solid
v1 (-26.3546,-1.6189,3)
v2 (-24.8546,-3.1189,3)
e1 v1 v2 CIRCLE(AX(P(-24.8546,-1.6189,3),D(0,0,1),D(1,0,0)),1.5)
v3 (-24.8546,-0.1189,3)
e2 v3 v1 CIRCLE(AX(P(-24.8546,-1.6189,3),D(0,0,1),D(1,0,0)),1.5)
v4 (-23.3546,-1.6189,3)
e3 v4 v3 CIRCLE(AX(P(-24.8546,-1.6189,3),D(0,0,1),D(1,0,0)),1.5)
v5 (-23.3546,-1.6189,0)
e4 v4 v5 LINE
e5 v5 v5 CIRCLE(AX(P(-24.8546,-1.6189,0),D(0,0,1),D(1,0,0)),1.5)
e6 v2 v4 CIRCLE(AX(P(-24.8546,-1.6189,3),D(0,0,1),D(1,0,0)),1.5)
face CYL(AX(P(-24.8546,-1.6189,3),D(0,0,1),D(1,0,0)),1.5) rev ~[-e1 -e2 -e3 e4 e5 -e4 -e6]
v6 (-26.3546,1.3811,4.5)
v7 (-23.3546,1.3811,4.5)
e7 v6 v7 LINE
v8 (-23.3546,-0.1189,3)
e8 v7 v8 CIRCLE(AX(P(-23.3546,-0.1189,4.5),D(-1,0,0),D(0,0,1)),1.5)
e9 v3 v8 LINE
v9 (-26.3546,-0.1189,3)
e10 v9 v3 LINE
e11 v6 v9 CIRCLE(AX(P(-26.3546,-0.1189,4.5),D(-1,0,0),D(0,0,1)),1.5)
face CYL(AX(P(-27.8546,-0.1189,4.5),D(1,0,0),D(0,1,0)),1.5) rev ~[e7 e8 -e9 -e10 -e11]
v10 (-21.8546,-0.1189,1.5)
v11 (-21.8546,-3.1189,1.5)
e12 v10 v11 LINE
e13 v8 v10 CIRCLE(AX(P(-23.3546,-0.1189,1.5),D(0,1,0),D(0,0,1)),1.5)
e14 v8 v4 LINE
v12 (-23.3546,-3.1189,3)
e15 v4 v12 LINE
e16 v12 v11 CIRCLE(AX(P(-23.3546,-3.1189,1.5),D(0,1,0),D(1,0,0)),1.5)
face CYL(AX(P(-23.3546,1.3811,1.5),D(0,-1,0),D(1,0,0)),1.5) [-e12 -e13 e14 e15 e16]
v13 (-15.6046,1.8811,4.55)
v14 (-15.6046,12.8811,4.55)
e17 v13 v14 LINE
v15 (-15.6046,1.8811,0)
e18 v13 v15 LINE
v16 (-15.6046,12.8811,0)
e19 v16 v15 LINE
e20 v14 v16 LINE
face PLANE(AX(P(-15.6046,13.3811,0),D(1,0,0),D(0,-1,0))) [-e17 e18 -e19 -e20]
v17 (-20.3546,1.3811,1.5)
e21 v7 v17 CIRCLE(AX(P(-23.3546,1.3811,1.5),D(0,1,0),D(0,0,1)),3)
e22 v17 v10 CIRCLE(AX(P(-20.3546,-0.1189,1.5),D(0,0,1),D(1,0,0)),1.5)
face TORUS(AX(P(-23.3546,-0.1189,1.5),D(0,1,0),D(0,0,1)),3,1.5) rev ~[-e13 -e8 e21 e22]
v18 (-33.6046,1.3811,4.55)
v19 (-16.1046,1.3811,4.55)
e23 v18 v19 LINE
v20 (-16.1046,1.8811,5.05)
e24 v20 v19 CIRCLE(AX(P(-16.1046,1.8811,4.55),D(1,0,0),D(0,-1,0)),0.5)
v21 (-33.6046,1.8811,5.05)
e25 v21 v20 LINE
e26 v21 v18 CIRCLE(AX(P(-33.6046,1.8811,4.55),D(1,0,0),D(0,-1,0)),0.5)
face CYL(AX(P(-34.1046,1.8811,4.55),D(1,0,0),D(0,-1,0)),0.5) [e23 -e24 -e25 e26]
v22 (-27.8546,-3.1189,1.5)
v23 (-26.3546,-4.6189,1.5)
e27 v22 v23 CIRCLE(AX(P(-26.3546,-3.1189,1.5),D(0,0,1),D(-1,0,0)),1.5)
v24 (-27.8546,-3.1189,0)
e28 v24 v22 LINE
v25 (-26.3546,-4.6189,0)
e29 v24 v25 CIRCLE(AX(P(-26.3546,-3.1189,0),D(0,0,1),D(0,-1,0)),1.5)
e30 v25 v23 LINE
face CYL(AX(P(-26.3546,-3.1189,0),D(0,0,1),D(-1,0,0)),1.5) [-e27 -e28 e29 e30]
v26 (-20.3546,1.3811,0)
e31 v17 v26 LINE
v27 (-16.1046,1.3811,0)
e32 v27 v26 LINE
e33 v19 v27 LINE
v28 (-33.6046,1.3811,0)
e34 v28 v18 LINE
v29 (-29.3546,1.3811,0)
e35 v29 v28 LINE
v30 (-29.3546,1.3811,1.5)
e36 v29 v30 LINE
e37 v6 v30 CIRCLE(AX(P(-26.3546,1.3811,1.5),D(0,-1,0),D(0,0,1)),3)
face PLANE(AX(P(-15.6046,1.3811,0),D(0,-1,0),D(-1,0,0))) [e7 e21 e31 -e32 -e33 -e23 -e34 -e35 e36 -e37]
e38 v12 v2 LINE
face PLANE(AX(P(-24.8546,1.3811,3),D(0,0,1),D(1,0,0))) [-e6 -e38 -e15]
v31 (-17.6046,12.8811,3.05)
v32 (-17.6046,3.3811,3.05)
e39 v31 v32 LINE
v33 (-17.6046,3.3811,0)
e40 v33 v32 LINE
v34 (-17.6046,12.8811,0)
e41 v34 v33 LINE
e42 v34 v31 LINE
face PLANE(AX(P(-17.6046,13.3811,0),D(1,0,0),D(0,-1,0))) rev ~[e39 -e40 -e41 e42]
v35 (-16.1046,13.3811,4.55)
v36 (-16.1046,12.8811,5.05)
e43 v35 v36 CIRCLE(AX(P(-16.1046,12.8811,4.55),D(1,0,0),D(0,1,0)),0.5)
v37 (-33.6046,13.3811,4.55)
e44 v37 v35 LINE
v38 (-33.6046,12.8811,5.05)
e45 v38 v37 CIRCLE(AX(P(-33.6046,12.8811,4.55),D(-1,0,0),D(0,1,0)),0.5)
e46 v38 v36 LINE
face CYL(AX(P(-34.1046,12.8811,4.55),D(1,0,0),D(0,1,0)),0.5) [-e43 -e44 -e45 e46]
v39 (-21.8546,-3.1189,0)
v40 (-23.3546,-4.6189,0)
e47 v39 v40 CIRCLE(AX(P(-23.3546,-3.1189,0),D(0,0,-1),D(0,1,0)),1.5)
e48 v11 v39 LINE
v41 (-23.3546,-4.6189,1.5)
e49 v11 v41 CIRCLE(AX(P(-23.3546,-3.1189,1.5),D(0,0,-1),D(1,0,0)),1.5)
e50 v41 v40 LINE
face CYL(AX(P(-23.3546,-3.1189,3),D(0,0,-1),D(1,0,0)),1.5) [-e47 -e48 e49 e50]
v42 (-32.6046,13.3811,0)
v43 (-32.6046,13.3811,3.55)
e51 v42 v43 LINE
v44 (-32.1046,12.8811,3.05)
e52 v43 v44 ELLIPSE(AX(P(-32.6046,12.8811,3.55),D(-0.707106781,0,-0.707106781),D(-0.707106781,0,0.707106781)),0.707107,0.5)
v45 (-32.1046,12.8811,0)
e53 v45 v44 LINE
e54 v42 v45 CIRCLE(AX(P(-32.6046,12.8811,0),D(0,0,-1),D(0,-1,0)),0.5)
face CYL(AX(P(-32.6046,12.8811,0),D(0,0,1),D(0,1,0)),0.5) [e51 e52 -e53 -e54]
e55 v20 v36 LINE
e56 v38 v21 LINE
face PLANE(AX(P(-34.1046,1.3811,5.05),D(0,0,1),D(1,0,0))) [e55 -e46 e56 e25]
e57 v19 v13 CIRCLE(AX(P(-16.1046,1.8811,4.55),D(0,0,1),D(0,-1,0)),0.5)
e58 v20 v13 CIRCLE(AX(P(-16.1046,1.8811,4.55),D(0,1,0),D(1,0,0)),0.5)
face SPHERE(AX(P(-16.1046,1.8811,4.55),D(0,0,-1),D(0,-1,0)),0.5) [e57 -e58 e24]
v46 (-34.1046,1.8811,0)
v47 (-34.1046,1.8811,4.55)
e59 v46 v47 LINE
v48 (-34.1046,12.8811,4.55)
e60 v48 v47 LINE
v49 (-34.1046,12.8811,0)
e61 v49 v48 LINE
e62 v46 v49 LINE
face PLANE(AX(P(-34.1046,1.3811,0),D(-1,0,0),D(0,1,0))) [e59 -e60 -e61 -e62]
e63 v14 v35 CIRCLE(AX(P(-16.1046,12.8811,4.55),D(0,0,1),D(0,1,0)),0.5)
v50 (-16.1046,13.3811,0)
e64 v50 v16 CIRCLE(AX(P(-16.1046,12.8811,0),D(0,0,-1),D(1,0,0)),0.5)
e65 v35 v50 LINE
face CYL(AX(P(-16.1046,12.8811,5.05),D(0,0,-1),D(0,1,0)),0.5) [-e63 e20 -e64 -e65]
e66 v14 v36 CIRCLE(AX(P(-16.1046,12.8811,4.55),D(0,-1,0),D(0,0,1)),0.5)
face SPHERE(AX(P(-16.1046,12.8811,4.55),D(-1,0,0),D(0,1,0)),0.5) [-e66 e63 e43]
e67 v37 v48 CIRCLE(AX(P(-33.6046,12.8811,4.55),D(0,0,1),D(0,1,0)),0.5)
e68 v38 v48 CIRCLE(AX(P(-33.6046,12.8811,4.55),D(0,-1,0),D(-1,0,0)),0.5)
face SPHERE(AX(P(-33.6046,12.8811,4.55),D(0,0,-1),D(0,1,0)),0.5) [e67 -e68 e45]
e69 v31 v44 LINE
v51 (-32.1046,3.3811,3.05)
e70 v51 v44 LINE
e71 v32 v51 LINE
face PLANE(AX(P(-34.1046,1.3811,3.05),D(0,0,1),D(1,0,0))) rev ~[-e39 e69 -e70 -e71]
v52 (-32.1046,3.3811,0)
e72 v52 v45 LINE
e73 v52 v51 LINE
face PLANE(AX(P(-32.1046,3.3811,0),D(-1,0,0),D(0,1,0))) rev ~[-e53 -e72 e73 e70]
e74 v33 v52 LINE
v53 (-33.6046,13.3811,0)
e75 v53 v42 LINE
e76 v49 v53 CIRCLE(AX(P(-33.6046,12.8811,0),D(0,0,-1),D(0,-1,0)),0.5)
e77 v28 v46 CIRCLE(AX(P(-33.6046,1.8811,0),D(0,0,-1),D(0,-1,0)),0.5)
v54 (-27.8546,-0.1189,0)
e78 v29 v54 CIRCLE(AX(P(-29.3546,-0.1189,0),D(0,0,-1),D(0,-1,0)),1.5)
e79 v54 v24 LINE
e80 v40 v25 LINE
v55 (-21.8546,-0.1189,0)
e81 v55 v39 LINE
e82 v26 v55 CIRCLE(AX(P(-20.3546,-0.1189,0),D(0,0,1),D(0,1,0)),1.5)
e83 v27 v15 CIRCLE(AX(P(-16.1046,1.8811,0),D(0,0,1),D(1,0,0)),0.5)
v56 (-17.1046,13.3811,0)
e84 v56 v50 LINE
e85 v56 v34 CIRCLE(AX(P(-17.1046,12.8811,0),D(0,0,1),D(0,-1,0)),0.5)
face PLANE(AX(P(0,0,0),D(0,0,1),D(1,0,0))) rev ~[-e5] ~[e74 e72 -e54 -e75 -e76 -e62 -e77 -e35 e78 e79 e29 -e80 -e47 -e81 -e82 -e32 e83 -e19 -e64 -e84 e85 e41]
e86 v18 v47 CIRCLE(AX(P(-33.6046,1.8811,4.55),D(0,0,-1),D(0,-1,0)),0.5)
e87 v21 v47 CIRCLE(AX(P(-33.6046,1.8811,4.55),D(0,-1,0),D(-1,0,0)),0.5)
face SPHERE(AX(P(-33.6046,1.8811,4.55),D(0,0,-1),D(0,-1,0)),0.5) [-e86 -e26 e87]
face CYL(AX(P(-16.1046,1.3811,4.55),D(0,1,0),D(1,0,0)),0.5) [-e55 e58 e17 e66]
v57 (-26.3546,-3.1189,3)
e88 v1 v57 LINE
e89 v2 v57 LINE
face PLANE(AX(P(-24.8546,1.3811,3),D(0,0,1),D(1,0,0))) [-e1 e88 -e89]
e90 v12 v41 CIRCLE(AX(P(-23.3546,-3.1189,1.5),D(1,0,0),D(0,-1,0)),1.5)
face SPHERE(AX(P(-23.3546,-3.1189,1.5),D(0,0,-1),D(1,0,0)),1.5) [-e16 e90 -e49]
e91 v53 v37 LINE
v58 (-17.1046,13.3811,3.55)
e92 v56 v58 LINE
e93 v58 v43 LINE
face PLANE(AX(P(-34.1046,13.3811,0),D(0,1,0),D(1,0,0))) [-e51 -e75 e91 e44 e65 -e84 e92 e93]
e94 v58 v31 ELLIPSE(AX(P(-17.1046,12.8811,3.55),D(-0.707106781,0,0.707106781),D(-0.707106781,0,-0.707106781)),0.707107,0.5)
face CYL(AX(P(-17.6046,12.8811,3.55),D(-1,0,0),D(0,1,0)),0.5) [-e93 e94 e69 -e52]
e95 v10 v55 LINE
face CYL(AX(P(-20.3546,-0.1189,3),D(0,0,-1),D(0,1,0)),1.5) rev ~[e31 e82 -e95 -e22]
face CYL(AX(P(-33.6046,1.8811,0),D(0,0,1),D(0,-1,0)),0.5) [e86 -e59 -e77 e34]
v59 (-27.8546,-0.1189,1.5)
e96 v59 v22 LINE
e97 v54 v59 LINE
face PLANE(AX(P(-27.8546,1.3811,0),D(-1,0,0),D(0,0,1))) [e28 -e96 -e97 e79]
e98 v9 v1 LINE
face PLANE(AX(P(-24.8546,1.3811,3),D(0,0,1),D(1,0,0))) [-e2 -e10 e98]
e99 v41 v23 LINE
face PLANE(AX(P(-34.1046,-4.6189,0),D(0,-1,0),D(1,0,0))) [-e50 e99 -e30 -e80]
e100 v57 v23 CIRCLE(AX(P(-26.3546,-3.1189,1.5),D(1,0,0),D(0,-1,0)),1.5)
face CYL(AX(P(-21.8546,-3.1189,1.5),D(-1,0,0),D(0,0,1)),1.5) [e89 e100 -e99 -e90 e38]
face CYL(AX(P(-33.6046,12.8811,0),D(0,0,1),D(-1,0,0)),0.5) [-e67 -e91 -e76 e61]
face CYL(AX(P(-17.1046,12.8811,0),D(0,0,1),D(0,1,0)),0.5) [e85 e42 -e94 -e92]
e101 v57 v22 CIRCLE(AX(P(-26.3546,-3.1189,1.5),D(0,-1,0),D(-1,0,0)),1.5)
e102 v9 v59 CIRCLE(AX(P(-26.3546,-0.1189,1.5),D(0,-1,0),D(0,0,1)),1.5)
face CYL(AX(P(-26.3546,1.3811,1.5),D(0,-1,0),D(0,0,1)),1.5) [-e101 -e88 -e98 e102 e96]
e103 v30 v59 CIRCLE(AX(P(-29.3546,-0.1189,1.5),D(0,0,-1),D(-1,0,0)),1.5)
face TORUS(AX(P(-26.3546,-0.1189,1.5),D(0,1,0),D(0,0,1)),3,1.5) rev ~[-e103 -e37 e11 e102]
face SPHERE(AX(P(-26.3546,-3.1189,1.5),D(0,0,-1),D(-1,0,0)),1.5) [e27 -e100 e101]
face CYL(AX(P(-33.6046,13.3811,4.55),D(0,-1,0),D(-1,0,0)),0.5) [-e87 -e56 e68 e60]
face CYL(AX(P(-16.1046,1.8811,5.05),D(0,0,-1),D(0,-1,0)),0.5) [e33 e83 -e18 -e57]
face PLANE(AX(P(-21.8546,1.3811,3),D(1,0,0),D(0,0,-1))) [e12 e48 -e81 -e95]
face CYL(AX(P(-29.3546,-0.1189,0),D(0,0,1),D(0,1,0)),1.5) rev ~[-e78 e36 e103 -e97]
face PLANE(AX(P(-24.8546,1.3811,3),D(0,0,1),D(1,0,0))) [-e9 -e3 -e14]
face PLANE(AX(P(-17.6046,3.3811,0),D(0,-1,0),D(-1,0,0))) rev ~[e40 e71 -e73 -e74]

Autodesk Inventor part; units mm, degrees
ref_plane "YZ Plane" through (0, 0, 0) normal (1, 0, 0) x (0, 1, 0)
ref_plane "XZ Plane" through (0, 0, 0) normal (0, 1, 0) x (-1, 0, 0)
sketch "Sketch1" plane through (0, 0, 0) normal (0, 0, 1) x (1, 0, 0)
  line L0 (-32.1046, 28.3811) -> (-17.6046, 28.3811) projected
  line L1 (-32.1046, 3.3811) -> (-32.1046, 28.3811) projected
  line L2 (-17.6046, 3.3811) -> (-32.1046, 3.3811) projected
  line L3 (-17.6046, 28.3811) -> (-17.6046, 3.3811) projected
  circle A0 centre (-21.0446, 24.002) radius 0.51 projected
  circle A1 centre (-21.0446, 26.542) radius 0.51 projected
  circle A2 centre (-23.5846, 26.542) radius 0.51 projected
  circle A3 centre (-23.5846, 24.002) radius 0.51 projected
  circle A4 centre (-26.1246, 26.542) radius 0.51 projected
  circle A5 centre (-26.1246, 24.002) radius 0.51 projected
  circle A6 centre (-28.6646, 26.542) radius 0.51 projected
  circle A7 centre (-28.6646, 24.002) radius 0.51 projected
  line L4 (-17.6046, 3.3811) -> (-17.6046, 13.3811)
  line L5 (-17.6046, 13.3811) -> (-15.6046, 13.3811)
  line L6 (-15.6046, 13.3811) -> (-15.6046, 1.3811)
  line L7 (-15.6046, 1.3811) -> (-32.1046, 1.3811)
  line L8 (-32.1046, 1.3811) -> (-34.1046, 1.3811)
  line L9 (-34.1046, 1.3811) -> (-34.1046, 13.3811)
  line L10 (-34.1046, 13.3811) -> (-32.1046, 13.3811)
  point P0 (0, 0)
  dimension "d0" = 10
  dimension "d1" = 2
  dimension "d2" = 90
  dimension "d3" = 12
  dimension "d4" = 90
  dimension "d5" = 2
  dimension "d6" = 12
ref_plane "Work Plane1" through (-32.1046, 3.3811, 3.05) normal (0, 0, 1) x (1, 0, 0)
extrude "Extrusion1" add sketch "Sketch1" along normal up to surface (3.05 mm away) contours L1 L2 L3 L5 L6 L7 L8 L9 L10
sketch "Sketch2" plane through (-34.1046, 1.3811, 3.05) normal (0, 0, 1) x (1, 0, 0)
  line L0 (16.5, 12) -> (18.5, 12) projected
  line L1 (18.5, 12) -> (0, 12)
  line L2 (0, 12) -> (0, 0)
  line L3 (0, 0) -> (18.5, 0)
  line L4 (18.5, 0) -> (18.5, 12)
  point P0 (34.1046, -1.3811)
extrude "Extrusion2" add sketch "Sketch2" along normal blind 2
sketch "Sketch3" plane through (-34.1046, 1.3811, 0) normal (0, -1, 0) x (1, 0, 0)
  line L0 (16.5, 0) -> (2, 0) projected
  line L1 (9.25, 0) -> (6.25, 0)
  line L2 (6.25, 0) -> (6.25, 3)
  line L3 (6.25, 3) -> (9.25, 3)
  line L4 (9.25, 3) -> (9.25, 0)
  line L5 (9.25, 3) -> (12.25, 3)
  line L6 (12.25, 3) -> (12.25, 0)
  line L7 (12.25, 0) -> (9.25, 0)
  line L8 (9.25, 0) -> (9.25, 3)
  point P0 (34.1046, 0)
  dimension "d11" = 3
  dimension "d12" = 3
  dimension "d13" = 3
extrude "Extrusion3" add sketch "Sketch3" along normal blind 6
fillet "Fillet1" radius 1.5 8 edges at (-27.8546, -4.6189, 1.5) (-21.8546, -4.6189, 1.5) (-24.8546, 1.3811, 3) (-27.8546, 1.3811, 1.5) (-21.8546, 1.3811, 1.5) (-27.8546, -1.6189, 3) (-21.8546, -1.6189, 3) (-24.8546, -4.6189, 3)
sketch "Sketch4" plane through (-26.3546, -3.1189, 3) normal (0, 0, 1) x (1, 0, 0)
  line L0 (0, 3) -> (3, 3) projected
  line L1 (3, 3) -> (3, 0) projected
  circle A0 centre (1.5, 1.5) radius 1.5
  point P0 (26.3546, 3.1189)
  dimension "d17" = 3
extrude "Extrusion4" cut sketch "Sketch4" against normal blind 6 contours A0
fillet "Fillet2" radius 0.5 11 edges at (-15.6046, 1.3811, 2.525) (-34.1046, 1.3811, 2.525) (-24.8546, 1.3811, 5.05) (-34.1046, 13.3811, 2.525) (-24.8546, 13.3811, 5.05) (-15.6046, 13.3811, 2.525) (-24.8546, 13.3811, 3.05) (-17.6046, 13.3811, 1.525) (-32.1046, 13.3811, 1.525) (-34.1046, 7.3811, 5.05) (-15.6046, 7.3811, 5.05)
properties part number "soporte esp1"
